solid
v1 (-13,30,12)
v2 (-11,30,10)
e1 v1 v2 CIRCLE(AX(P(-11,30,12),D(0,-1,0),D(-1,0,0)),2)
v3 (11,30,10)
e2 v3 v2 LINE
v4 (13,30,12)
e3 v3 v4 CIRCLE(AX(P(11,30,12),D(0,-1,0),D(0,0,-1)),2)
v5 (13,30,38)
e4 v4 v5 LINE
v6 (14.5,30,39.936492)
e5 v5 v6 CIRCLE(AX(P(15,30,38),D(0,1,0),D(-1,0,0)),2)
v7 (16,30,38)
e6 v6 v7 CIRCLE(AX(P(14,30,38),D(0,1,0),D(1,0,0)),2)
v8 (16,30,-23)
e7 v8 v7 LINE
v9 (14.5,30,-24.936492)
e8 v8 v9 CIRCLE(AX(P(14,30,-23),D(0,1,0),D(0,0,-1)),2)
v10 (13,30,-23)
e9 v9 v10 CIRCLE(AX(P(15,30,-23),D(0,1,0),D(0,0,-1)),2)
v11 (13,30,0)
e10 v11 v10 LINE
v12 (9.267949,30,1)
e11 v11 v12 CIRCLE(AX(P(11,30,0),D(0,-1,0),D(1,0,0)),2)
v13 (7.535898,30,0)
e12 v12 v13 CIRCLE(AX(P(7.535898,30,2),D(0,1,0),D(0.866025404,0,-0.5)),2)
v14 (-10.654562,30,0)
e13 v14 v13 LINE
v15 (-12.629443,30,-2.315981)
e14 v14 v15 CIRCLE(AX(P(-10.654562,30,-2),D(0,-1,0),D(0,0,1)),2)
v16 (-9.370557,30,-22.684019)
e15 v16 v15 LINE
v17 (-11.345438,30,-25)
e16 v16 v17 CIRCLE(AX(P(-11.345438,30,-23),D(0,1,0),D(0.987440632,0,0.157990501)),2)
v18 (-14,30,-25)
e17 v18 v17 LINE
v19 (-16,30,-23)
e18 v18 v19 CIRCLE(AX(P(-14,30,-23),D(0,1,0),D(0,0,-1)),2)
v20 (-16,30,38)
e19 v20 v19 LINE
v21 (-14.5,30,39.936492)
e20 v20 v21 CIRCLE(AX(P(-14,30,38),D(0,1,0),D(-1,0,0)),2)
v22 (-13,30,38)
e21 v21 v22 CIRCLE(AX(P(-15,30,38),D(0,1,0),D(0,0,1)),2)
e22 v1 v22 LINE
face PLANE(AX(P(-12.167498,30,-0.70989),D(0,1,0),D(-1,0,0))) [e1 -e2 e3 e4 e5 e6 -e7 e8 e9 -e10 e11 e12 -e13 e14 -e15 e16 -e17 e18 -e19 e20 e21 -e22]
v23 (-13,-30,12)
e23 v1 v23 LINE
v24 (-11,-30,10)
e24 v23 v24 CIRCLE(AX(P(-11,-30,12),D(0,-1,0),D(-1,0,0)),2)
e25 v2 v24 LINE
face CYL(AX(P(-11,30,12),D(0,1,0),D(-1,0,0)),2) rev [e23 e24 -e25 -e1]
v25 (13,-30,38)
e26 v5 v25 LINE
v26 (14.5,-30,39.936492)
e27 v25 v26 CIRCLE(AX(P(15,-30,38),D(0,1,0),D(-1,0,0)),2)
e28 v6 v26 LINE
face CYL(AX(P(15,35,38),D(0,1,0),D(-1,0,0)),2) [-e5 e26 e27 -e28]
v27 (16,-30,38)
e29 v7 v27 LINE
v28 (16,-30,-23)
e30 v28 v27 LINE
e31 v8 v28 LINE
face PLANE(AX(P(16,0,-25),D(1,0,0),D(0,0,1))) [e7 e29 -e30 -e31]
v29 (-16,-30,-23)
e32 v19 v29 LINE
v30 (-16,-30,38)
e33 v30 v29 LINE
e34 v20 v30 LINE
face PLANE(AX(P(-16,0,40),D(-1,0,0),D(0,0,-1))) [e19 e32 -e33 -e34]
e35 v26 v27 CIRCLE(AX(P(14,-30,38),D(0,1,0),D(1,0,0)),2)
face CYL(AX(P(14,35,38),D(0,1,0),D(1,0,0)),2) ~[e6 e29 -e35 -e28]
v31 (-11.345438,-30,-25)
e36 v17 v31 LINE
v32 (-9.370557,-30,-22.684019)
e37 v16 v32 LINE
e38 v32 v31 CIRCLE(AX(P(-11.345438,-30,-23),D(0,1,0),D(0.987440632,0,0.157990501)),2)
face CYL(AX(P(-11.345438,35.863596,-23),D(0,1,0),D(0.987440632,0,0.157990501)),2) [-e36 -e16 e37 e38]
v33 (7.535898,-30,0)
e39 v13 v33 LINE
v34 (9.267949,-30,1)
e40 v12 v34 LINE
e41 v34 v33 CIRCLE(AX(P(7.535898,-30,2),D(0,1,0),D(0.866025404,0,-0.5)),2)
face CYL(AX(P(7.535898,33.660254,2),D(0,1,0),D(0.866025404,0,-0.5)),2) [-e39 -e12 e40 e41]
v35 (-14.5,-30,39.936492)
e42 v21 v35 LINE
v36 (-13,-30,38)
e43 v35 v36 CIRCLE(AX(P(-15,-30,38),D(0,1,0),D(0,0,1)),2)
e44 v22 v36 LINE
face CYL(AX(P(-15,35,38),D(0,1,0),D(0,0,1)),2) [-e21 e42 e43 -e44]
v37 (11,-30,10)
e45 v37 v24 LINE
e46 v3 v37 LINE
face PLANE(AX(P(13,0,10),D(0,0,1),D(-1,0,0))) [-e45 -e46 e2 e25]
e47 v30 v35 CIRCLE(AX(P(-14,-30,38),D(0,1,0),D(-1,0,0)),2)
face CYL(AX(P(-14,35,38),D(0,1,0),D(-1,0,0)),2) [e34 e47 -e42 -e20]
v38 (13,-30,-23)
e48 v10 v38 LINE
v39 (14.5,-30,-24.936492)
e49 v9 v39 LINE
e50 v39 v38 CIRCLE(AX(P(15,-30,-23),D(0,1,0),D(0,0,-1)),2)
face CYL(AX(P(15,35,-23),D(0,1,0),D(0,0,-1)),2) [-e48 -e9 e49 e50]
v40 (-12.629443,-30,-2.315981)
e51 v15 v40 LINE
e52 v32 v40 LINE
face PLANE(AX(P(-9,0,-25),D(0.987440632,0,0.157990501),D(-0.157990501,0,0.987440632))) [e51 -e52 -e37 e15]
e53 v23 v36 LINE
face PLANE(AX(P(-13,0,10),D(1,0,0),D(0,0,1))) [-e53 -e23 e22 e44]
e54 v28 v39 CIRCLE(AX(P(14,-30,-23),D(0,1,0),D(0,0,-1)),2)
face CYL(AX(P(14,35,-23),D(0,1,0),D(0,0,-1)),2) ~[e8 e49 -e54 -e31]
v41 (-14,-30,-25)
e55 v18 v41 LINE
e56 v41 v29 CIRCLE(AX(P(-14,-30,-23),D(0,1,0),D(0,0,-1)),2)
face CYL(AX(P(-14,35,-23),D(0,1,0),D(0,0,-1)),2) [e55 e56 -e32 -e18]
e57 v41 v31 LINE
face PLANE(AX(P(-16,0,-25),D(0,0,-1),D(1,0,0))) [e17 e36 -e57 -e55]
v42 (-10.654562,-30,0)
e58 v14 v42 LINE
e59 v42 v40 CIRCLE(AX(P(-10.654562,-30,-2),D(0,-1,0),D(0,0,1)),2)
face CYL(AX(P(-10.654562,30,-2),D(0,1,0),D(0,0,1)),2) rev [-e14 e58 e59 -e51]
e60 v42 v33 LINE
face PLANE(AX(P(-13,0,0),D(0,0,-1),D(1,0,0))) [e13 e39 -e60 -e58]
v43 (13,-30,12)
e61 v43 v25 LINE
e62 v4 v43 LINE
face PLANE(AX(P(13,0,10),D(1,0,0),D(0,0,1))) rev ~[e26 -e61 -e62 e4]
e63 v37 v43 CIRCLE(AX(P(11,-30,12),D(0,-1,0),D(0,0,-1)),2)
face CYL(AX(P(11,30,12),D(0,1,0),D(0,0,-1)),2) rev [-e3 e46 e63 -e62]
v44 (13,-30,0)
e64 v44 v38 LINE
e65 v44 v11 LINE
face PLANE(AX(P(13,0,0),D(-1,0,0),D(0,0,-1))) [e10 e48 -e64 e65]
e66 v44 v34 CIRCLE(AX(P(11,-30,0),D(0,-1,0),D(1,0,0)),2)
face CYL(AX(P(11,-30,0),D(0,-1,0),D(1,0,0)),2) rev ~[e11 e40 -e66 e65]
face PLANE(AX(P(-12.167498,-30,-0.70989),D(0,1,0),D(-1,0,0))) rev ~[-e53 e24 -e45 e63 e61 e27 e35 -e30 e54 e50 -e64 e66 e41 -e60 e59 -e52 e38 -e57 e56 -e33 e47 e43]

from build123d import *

# Parameters (mm, degrees)
F0_W        = 3
F0_H        = 30
F1_DEPTH    = 30
F3_DEPTH    = 60
F4_T1_DEPTH = 60
F4_T3_DEPTH = 71.7271911209
F4_T5_DEPTH = 70
F4_T7_DEPTH = 67.3205080757


# Not quite as in the source:
# - a fillet or chamfer that OpenCascade refuses, or shapes differently, is made with other operations: its cross-section is extruded or revolved along the edge and cut away or added


with BuildPart() as f1:
    # F0 (on Front) → F1 (new body, symmetric)
    with BuildSketch(Plane.XZ):
        Polygon((13, -25), (16, -25), (16, 10), (13, 10), (-13, 10), (-16, 10), (-16, -25), (-9, -25), (-13, 0), (13, 0), align=None)
        with Locations((-14.5, 25)):
            Rectangle(F0_W, F0_H)
        with Locations((14.5, 25)):
            Rectangle(F0_W, F0_H)
    extrude(amount=F1_DEPTH, both=True)

    # F2 (on face) → F3 (cut, through all)
    with BuildSketch(Plane.XZ.offset(30)):
        with BuildLine():
            Line((9, 0), (13, 0))
            ThreePointArc((13, 0), (11, 2), (9, 0))
        make_face()
    extrude(amount=-F3_DEPTH, mode=Mode.SUBTRACT)

    # F4: fillet of radius 2 on 13 edges, made by hand

    # F4_s2 → F4_t1 (join)
    with BuildSketch(Plane.XZ.offset(-30)):
        with BuildLine():
            ThreePointArc((-10.6545617758, 0), (-12.1763965245, -0.7023024244), (-12.6294430396, -2.3159810022))
            Line((-12.6294430396, -2.3159810022), (-13, 0))
            Line((-13, 0), (-10.6545617758, 0))
        make_face()
        with BuildLine():
            ThreePointArc((-13, 12), (-12.4142135624, 10.5857864376), (-11, 10))
            Line((-11, 10), (-13, 10))
            Line((-13, 10), (-13, 12))
        make_face()
        with BuildLine():
            ThreePointArc((11, 10), (12.4142135624, 10.5857864376), (13, 12))
            Line((13, 12), (13, 10))
            Line((13, 10), (11, 10))
        make_face()
    extrude(amount=F4_T1_DEPTH)

    # F4_s4 → F4_t3 (cut)
    with BuildSketch(Plane.XZ.offset(-35.8635955605)):
        with BuildLine():
            ThreePointArc((-9.3705569604, -22.6840189978), (-9.8236034755, -24.2976975756), (-11.3454382242, -25))
            Line((-11.3454382242, -25), (-9, -25))
            Line((-9, -25), (-9.3705569604, -22.6840189978))
        make_face()
    extrude(amount=F4_T3_DEPTH, mode=Mode.SUBTRACT)

    # F4_s6 → F4_t5 (cut)
    with BuildSketch(Plane.XZ.offset(-35)):
        with BuildLine():
            ThreePointArc((-14, -25), (-15.4142135624, -24.4142135624), (-16, -23))
            Line((-16, -23), (-16, -25))
            Line((-16, -25), (-14, -25))
        make_face()
        with BuildLine():
            ThreePointArc((14, -25), (15.4142135624, -24.4142135624), (16, -23))
            Line((16, -23), (16, -25))
            Line((16, -25), (14, -25))
        make_face()
        with BuildLine():
            ThreePointArc((-15, 40), (-13.5857864376, 39.4142135624), (-13, 38))
            Line((-13, 38), (-13, 40))
            Line((-13, 40), (-15, 40))
        make_face()
        with BuildLine():
            ThreePointArc((-16, 38), (-15.4142135624, 39.4142135624), (-14, 40))
            Line((-14, 40), (-16, 40))
            Line((-16, 40), (-16, 38))
        make_face()
        with BuildLine():
            ThreePointArc((16, 38), (15.4142135624, 39.4142135624), (14, 40))
            Line((14, 40), (16, 40))
            Line((16, 40), (16, 38))
        make_face()
        with BuildLine():
            ThreePointArc((13, 38), (13.5857864376, 39.4142135624), (15, 40))
            Line((15, 40), (13, 40))
            Line((13, 40), (13, 38))
        make_face()
        with BuildLine():
            ThreePointArc((15, -25), (13.5857864376, -24.4142135624), (13, -23))
            Line((13, -23), (13, -25))
            Line((13, -25), (15, -25))
        make_face()
    extrude(amount=F4_T5_DEPTH, mode=Mode.SUBTRACT)

    # F4_s8 → F4_t7 (cut)
    with BuildSketch(Plane.XZ.offset(-33.6602540378)):
        with BuildLine():
            ThreePointArc((9.2679491924, 1), (8.5358983849, 0.2679491924), (7.5358983849, 0))
            Line((7.5358983849, 0), (9, 0))
            ThreePointArc((9, 0), (9.0681483474, 0.5176380902), (9.2679491924, 1))
        make_face()
    extrude(amount=F4_T7_DEPTH, mode=Mode.SUBTRACT)


solid = f1.part
